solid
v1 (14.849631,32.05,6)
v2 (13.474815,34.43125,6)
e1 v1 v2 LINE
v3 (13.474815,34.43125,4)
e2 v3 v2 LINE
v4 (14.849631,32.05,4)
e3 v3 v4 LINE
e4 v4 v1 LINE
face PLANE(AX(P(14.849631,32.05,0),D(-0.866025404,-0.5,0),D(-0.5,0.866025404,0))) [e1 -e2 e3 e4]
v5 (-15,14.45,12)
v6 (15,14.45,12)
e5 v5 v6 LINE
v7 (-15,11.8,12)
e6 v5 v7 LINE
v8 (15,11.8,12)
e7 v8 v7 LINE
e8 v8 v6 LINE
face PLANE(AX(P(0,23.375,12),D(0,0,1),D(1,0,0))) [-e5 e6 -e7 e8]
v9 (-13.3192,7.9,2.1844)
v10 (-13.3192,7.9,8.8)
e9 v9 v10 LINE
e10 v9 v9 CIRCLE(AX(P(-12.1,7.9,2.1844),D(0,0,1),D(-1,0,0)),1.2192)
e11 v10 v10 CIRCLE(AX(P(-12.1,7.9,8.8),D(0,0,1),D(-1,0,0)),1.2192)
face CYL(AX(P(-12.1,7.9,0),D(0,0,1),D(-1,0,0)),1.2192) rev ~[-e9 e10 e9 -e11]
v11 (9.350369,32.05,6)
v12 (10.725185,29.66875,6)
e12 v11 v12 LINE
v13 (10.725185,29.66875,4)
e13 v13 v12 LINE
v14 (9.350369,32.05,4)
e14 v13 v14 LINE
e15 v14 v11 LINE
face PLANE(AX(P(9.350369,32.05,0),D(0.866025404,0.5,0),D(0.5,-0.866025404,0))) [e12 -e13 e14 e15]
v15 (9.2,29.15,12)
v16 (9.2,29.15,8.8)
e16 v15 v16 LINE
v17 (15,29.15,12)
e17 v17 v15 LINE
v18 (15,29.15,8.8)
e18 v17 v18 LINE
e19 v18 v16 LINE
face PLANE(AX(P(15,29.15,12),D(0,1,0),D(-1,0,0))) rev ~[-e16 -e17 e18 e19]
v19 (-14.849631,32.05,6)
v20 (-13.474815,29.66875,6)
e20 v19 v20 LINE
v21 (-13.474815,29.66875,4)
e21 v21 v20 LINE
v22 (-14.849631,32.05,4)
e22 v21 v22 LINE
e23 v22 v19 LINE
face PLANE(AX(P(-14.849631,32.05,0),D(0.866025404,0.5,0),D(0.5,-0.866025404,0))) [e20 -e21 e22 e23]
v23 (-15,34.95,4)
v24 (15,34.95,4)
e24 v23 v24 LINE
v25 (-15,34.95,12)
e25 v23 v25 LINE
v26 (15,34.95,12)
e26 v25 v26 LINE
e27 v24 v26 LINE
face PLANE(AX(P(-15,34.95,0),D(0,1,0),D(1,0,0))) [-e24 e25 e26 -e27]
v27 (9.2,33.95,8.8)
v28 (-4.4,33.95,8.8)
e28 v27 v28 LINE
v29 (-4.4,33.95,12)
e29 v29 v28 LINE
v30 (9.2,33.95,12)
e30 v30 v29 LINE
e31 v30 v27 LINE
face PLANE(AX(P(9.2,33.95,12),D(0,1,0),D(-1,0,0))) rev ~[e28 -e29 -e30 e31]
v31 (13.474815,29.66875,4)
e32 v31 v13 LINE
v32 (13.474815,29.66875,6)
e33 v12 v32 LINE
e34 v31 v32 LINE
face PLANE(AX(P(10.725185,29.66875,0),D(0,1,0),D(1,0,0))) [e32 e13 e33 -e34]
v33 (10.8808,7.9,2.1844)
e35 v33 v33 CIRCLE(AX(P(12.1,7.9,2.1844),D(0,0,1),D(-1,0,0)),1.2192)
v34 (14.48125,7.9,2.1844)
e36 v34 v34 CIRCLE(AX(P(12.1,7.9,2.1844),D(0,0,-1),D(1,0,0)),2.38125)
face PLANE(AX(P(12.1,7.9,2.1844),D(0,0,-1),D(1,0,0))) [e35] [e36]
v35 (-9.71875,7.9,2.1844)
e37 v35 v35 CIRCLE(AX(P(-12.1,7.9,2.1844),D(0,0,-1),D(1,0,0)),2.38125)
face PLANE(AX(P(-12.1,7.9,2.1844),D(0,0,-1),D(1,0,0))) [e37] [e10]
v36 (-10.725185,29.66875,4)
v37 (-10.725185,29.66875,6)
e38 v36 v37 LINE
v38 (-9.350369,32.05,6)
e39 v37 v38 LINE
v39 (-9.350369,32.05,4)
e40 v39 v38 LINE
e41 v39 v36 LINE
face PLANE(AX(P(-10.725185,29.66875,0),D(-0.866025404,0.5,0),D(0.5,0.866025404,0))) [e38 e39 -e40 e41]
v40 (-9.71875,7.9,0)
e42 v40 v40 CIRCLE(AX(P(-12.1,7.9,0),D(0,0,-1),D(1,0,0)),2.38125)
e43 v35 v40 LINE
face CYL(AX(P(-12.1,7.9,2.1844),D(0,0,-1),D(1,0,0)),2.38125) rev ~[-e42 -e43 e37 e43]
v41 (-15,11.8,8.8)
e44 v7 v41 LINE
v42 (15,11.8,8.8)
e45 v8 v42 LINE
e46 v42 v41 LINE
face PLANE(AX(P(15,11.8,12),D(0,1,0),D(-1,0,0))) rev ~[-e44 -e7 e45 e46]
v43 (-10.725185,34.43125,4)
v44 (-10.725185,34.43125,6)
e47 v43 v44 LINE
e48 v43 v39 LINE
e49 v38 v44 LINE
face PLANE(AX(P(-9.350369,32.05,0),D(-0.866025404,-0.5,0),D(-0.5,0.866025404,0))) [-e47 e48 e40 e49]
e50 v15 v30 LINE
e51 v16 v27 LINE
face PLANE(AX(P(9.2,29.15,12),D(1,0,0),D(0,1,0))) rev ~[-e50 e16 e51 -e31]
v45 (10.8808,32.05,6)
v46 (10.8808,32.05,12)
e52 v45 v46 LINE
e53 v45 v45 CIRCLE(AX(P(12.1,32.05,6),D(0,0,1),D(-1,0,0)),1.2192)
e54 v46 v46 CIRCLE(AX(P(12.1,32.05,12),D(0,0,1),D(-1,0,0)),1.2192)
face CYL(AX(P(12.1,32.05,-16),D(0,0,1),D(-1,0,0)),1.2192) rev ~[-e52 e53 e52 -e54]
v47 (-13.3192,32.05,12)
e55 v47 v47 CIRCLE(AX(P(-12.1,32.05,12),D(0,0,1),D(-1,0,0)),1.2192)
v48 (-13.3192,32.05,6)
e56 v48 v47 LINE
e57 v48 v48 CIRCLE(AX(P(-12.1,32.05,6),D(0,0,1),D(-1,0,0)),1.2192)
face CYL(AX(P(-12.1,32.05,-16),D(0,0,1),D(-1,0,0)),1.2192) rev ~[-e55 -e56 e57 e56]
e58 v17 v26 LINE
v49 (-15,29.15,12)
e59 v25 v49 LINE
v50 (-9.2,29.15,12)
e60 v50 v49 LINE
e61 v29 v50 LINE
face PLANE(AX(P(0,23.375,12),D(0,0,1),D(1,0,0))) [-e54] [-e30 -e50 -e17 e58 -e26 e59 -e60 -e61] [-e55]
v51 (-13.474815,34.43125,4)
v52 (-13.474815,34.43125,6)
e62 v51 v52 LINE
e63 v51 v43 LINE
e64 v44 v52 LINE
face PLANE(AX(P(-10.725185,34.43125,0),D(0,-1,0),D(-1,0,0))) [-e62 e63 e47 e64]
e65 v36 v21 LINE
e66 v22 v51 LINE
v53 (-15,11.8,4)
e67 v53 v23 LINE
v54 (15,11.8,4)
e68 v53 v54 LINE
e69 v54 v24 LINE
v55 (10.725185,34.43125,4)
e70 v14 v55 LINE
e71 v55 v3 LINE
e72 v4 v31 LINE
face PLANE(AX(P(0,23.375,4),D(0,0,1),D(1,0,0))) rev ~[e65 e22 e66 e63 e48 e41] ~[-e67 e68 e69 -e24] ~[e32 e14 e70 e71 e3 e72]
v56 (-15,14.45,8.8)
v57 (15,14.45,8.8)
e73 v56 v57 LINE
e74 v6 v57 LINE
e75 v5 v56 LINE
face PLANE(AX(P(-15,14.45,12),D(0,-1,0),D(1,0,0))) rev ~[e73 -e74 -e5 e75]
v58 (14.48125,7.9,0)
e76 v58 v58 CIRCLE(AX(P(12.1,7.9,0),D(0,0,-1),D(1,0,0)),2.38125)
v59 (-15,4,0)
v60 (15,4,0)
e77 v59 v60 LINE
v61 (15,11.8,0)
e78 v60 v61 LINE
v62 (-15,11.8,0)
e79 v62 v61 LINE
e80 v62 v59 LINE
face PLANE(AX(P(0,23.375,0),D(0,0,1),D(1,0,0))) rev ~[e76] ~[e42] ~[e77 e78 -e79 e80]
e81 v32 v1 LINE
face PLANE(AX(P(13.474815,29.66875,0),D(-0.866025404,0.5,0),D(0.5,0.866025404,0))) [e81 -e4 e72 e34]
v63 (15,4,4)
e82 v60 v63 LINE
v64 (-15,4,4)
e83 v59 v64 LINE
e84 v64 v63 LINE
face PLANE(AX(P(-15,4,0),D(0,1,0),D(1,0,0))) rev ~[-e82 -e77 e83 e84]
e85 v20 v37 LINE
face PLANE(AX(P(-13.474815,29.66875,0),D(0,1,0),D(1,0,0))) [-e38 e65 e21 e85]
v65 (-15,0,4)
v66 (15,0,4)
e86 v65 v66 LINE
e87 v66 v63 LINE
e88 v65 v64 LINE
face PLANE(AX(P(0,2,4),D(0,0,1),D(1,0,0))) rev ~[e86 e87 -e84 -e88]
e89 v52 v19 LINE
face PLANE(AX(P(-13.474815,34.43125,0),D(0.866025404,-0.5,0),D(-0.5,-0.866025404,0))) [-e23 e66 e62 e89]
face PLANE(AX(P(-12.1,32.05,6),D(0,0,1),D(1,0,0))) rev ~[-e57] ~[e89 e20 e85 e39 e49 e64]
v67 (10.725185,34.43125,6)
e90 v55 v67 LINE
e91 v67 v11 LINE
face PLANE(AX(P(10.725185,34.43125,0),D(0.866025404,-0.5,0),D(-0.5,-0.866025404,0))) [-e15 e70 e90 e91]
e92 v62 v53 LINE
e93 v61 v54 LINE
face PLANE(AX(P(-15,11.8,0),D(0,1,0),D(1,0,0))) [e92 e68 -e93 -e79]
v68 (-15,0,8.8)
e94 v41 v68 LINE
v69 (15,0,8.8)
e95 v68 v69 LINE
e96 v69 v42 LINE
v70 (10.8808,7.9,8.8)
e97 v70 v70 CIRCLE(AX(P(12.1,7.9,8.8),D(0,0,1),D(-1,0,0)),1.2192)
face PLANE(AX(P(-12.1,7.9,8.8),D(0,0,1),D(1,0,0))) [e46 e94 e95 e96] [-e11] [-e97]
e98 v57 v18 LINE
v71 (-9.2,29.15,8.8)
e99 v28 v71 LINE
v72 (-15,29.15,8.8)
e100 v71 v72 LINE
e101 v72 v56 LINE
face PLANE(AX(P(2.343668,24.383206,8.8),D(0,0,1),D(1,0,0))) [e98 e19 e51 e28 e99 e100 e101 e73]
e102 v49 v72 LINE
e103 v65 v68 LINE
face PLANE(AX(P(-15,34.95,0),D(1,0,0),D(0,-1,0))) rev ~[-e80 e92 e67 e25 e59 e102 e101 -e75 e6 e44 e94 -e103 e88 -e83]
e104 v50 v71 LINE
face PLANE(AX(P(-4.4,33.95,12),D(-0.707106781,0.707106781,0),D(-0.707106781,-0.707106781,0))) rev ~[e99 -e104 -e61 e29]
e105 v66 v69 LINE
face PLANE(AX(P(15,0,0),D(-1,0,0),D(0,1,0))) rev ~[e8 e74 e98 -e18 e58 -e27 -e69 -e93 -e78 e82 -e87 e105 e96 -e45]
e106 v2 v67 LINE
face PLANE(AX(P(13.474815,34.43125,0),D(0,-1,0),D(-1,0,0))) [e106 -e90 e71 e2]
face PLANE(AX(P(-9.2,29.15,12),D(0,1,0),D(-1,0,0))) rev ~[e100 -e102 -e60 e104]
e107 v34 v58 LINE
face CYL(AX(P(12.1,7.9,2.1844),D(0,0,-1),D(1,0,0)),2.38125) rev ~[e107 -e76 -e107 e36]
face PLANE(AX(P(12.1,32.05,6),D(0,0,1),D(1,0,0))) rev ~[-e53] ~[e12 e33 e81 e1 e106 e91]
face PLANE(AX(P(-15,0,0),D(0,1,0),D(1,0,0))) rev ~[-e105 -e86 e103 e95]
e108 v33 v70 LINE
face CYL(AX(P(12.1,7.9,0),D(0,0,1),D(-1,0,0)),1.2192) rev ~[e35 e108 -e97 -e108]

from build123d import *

# Parameters (mm, degrees)
F0_W           = 30
F0_H           = 23.15
F0_H_2         = 6.8
F0_R           = 1.3
F0_H_3         = 4
F0_H_4         = 1
F1_DEPTH       = 12
F2_W           = 5.8
F2_H           = 5.8
F3_DEPTH       = 3.2
F4_DEPTH       = 4
F5_D           = 2.4384
F5_DEPTH       = 10
F5_CBORE_D     = 4.7625
F5_CBORE_DEPTH = 2.1844
F5_TIP         = 0.7325692667
F6_D           = 2.4384
F6_DEPTH       = 20
F6_START       = 4
F6_TIP         = 0.7325692667
F7_DEPTH       = 6


# Not quite as in the source:
# - a feature names something its author has since deleted; it is built from what else it names


with BuildPart() as f1:
    # F0 (on Top) → F1 (new body)
    with BuildSketch(Plane.XY):
        with Locations((0, 23.375)):
            Rectangle(F0_W, F0_H)
        Polygon((-10.7251846715, 34.43125), (-9.350369343, 32.05), (-10.7251846715, 29.66875), (-13.4748153285, 29.66875), (-14.849630657, 32.05), (-13.4748153285, 34.43125), align=None, mode=Mode.SUBTRACT)
        Polygon((10.7251846715, 29.66875), (9.350369343, 32.05), (10.7251846715, 34.43125), (13.4748153285, 34.43125), (14.849630657, 32.05), (13.4748153285, 29.66875), align=None, mode=Mode.SUBTRACT)
        with Locations((0, 7.4)):
            Rectangle(F0_W, F0_H_2)
        with Locations((-12.1, 7.9)):
            Circle(F0_R, mode=Mode.SUBTRACT)
        with Locations((12.1, 7.9)):
            Circle(F0_R, mode=Mode.SUBTRACT)
        with Locations((0, 2)):
            Rectangle(F0_W, F0_H_3)
        with Locations((0, 11.3)):
            Rectangle(F0_W, F0_H_4)
        Polygon((-10.7251846715, 29.66875), (-9.350369343, 32.05), (-10.7251846715, 34.43125), (-13.4748153285, 34.43125), (-14.849630657, 32.05), (-13.4748153285, 29.66875), align=None)
        with Locations((-12.1, 32.05)):
            Circle(F0_R, mode=Mode.SUBTRACT)
        Polygon((10.7251846715, 34.43125), (9.350369343, 32.05), (10.7251846715, 29.66875), (13.4748153285, 29.66875), (14.849630657, 32.05), (13.4748153285, 34.43125), align=None)
        with Locations((12.1, 32.05)):
            Circle(F0_R, mode=Mode.SUBTRACT)
        with Locations((-12.1, 32.05)):
            Circle(F0_R)
        with Locations((12.1, 32.05)):
            Circle(F0_R)
        with Locations((12.1, 7.9)):
            Circle(F0_R)
        with Locations((-12.1, 7.9)):
            Circle(F0_R)
    extrude(amount=F1_DEPTH)

    # F2 (on face) → F3 (cut)
    with BuildSketch(Plane.XY.offset(12)):
        with Locations((-12.1, 7.9)):
            Rectangle(F2_W, F2_H)
        Polygon((9.2, 5), (9.2, 10.8), (-9.2, 10.8), (-9.2, 5), (-15, 5), (-15, 0), (15, 0), (15, 5), align=None)
        with Locations((12.1, 7.9)):
            Rectangle(F2_W, F2_H)
        Polygon((9.2, 10.8), (15, 10.8), (15, 11.8), (-15, 11.8), (-15, 10.8), (-9.2, 10.8), align=None)
        Polygon((-3.4, 14.45), (9.2, 14.45), (9.2, 20.25), (15, 20.25), (15, 29.15), (9.2, 29.15), (9.2, 33.95), (-4.4, 33.95), (-9.2, 29.15), (-13.65, 24.7), (-9.2, 20.25), align=None)
        Polygon((-15, 23.35), (-15, 20.25), (-9.2, 20.25), (-13.65, 24.7), align=None)
        Polygon((-15, 26.05), (-13.65, 24.7), (-9.2, 29.15), (-15, 29.15), align=None)
        Polygon((-15, 26.05), (-15, 23.35), (-13.65, 24.7), align=None)
        Polygon((-9.2, 14.45), (-3.4, 14.45), (-9.2, 20.25), align=None)
        with Locations((-12.1, 17.35)):
            Rectangle(F2_W, F2_H)
        with Locations((12.1, 17.35)):
            Rectangle(F2_W, F2_H)
    extrude(amount=-F3_DEPTH, mode=Mode.SUBTRACT)

    # F0 (on Top) → F4 (cut)
    with BuildSketch(Plane.XY):
        with Locations((0, 23.375)):
            Rectangle(F0_W, F0_H)
        Polygon((-10.7251846715, 34.43125), (-9.350369343, 32.05), (-10.7251846715, 29.66875), (-13.4748153285, 29.66875), (-14.849630657, 32.05), (-13.4748153285, 34.43125), align=None, mode=Mode.SUBTRACT)
        Polygon((10.7251846715, 29.66875), (9.350369343, 32.05), (10.7251846715, 34.43125), (13.4748153285, 34.43125), (14.849630657, 32.05), (13.4748153285, 29.66875), align=None, mode=Mode.SUBTRACT)
        with Locations((0, 2)):
            Rectangle(F0_W, F0_H_3)
        Polygon((-10.7251846715, 29.66875), (-9.350369343, 32.05), (-10.7251846715, 34.43125), (-13.4748153285, 34.43125), (-14.849630657, 32.05), (-13.4748153285, 29.66875), align=None)
        with Locations((-12.1, 32.05)):
            Circle(F0_R, mode=Mode.SUBTRACT)
        Polygon((10.7251846715, 34.43125), (9.350369343, 32.05), (10.7251846715, 29.66875), (13.4748153285, 29.66875), (14.849630657, 32.05), (13.4748153285, 34.43125), align=None)
        with Locations((12.1, 32.05)):
            Circle(F0_R, mode=Mode.SUBTRACT)
        with Locations((-12.1, 32.05)):
            Circle(F0_R)
        with Locations((12.1, 32.05)):
            Circle(F0_R)
    extrude(amount=F4_DEPTH, mode=Mode.SUBTRACT)

    # F5
    with Locations(Plane(origin=(0, 0, 0), x_dir=(1, 0, 0), z_dir=(0, 0, -1))):
        with Locations((-12.1, -7.9), (12.1, -7.9)):
            CounterBoreHole(F5_D / 2, F5_CBORE_D / 2, F5_CBORE_DEPTH, depth=F5_DEPTH)
            with Locations((0, 0, -(F5_DEPTH + F5_TIP / 2))):  # 118° drill point
                Cone(0, F5_D / 2, F5_TIP, mode=Mode.SUBTRACT)

    # F6
    # its depths count from where the whole tool has entered the part; down to there all is cleared
    with Locations(Plane(origin=(0, 0, 0), x_dir=(1, 0, 0), z_dir=(0, 0, -1)).offset(-F6_START)):
        with Locations((-12.1, -32.05), (12.1, -32.05)):
            Hole(F6_D / 2, depth=F6_DEPTH)
            with Locations((0, 0, -(F6_DEPTH + F6_TIP / 2))):  # 118° drill point
                Cone(0, F6_D / 2, F6_TIP, mode=Mode.SUBTRACT)

    # F0 (on Top) → F7 (cut)
    with BuildSketch(Plane.XY):
        Polygon((-10.7251846715, 29.66875), (-9.350369343, 32.05), (-10.7251846715, 34.43125), (-13.4748153285, 34.43125), (-14.849630657, 32.05), (-13.4748153285, 29.66875), align=None)
        with Locations((-12.1, 32.05)):
            Circle(F0_R, mode=Mode.SUBTRACT)
        Polygon((10.7251846715, 34.43125), (9.350369343, 32.05), (10.7251846715, 29.66875), (13.4748153285, 29.66875), (14.849630657, 32.05), (13.4748153285, 34.43125), align=None)
        with Locations((12.1, 32.05)):
            Circle(F0_R, mode=Mode.SUBTRACT)
        with Locations((12.1, 32.05)):
            Circle(F0_R)
        with Locations((-12.1, 32.05)):
            Circle(F0_R)
    extrude(amount=F7_DEPTH, mode=Mode.SUBTRACT)


solid = f1.part
